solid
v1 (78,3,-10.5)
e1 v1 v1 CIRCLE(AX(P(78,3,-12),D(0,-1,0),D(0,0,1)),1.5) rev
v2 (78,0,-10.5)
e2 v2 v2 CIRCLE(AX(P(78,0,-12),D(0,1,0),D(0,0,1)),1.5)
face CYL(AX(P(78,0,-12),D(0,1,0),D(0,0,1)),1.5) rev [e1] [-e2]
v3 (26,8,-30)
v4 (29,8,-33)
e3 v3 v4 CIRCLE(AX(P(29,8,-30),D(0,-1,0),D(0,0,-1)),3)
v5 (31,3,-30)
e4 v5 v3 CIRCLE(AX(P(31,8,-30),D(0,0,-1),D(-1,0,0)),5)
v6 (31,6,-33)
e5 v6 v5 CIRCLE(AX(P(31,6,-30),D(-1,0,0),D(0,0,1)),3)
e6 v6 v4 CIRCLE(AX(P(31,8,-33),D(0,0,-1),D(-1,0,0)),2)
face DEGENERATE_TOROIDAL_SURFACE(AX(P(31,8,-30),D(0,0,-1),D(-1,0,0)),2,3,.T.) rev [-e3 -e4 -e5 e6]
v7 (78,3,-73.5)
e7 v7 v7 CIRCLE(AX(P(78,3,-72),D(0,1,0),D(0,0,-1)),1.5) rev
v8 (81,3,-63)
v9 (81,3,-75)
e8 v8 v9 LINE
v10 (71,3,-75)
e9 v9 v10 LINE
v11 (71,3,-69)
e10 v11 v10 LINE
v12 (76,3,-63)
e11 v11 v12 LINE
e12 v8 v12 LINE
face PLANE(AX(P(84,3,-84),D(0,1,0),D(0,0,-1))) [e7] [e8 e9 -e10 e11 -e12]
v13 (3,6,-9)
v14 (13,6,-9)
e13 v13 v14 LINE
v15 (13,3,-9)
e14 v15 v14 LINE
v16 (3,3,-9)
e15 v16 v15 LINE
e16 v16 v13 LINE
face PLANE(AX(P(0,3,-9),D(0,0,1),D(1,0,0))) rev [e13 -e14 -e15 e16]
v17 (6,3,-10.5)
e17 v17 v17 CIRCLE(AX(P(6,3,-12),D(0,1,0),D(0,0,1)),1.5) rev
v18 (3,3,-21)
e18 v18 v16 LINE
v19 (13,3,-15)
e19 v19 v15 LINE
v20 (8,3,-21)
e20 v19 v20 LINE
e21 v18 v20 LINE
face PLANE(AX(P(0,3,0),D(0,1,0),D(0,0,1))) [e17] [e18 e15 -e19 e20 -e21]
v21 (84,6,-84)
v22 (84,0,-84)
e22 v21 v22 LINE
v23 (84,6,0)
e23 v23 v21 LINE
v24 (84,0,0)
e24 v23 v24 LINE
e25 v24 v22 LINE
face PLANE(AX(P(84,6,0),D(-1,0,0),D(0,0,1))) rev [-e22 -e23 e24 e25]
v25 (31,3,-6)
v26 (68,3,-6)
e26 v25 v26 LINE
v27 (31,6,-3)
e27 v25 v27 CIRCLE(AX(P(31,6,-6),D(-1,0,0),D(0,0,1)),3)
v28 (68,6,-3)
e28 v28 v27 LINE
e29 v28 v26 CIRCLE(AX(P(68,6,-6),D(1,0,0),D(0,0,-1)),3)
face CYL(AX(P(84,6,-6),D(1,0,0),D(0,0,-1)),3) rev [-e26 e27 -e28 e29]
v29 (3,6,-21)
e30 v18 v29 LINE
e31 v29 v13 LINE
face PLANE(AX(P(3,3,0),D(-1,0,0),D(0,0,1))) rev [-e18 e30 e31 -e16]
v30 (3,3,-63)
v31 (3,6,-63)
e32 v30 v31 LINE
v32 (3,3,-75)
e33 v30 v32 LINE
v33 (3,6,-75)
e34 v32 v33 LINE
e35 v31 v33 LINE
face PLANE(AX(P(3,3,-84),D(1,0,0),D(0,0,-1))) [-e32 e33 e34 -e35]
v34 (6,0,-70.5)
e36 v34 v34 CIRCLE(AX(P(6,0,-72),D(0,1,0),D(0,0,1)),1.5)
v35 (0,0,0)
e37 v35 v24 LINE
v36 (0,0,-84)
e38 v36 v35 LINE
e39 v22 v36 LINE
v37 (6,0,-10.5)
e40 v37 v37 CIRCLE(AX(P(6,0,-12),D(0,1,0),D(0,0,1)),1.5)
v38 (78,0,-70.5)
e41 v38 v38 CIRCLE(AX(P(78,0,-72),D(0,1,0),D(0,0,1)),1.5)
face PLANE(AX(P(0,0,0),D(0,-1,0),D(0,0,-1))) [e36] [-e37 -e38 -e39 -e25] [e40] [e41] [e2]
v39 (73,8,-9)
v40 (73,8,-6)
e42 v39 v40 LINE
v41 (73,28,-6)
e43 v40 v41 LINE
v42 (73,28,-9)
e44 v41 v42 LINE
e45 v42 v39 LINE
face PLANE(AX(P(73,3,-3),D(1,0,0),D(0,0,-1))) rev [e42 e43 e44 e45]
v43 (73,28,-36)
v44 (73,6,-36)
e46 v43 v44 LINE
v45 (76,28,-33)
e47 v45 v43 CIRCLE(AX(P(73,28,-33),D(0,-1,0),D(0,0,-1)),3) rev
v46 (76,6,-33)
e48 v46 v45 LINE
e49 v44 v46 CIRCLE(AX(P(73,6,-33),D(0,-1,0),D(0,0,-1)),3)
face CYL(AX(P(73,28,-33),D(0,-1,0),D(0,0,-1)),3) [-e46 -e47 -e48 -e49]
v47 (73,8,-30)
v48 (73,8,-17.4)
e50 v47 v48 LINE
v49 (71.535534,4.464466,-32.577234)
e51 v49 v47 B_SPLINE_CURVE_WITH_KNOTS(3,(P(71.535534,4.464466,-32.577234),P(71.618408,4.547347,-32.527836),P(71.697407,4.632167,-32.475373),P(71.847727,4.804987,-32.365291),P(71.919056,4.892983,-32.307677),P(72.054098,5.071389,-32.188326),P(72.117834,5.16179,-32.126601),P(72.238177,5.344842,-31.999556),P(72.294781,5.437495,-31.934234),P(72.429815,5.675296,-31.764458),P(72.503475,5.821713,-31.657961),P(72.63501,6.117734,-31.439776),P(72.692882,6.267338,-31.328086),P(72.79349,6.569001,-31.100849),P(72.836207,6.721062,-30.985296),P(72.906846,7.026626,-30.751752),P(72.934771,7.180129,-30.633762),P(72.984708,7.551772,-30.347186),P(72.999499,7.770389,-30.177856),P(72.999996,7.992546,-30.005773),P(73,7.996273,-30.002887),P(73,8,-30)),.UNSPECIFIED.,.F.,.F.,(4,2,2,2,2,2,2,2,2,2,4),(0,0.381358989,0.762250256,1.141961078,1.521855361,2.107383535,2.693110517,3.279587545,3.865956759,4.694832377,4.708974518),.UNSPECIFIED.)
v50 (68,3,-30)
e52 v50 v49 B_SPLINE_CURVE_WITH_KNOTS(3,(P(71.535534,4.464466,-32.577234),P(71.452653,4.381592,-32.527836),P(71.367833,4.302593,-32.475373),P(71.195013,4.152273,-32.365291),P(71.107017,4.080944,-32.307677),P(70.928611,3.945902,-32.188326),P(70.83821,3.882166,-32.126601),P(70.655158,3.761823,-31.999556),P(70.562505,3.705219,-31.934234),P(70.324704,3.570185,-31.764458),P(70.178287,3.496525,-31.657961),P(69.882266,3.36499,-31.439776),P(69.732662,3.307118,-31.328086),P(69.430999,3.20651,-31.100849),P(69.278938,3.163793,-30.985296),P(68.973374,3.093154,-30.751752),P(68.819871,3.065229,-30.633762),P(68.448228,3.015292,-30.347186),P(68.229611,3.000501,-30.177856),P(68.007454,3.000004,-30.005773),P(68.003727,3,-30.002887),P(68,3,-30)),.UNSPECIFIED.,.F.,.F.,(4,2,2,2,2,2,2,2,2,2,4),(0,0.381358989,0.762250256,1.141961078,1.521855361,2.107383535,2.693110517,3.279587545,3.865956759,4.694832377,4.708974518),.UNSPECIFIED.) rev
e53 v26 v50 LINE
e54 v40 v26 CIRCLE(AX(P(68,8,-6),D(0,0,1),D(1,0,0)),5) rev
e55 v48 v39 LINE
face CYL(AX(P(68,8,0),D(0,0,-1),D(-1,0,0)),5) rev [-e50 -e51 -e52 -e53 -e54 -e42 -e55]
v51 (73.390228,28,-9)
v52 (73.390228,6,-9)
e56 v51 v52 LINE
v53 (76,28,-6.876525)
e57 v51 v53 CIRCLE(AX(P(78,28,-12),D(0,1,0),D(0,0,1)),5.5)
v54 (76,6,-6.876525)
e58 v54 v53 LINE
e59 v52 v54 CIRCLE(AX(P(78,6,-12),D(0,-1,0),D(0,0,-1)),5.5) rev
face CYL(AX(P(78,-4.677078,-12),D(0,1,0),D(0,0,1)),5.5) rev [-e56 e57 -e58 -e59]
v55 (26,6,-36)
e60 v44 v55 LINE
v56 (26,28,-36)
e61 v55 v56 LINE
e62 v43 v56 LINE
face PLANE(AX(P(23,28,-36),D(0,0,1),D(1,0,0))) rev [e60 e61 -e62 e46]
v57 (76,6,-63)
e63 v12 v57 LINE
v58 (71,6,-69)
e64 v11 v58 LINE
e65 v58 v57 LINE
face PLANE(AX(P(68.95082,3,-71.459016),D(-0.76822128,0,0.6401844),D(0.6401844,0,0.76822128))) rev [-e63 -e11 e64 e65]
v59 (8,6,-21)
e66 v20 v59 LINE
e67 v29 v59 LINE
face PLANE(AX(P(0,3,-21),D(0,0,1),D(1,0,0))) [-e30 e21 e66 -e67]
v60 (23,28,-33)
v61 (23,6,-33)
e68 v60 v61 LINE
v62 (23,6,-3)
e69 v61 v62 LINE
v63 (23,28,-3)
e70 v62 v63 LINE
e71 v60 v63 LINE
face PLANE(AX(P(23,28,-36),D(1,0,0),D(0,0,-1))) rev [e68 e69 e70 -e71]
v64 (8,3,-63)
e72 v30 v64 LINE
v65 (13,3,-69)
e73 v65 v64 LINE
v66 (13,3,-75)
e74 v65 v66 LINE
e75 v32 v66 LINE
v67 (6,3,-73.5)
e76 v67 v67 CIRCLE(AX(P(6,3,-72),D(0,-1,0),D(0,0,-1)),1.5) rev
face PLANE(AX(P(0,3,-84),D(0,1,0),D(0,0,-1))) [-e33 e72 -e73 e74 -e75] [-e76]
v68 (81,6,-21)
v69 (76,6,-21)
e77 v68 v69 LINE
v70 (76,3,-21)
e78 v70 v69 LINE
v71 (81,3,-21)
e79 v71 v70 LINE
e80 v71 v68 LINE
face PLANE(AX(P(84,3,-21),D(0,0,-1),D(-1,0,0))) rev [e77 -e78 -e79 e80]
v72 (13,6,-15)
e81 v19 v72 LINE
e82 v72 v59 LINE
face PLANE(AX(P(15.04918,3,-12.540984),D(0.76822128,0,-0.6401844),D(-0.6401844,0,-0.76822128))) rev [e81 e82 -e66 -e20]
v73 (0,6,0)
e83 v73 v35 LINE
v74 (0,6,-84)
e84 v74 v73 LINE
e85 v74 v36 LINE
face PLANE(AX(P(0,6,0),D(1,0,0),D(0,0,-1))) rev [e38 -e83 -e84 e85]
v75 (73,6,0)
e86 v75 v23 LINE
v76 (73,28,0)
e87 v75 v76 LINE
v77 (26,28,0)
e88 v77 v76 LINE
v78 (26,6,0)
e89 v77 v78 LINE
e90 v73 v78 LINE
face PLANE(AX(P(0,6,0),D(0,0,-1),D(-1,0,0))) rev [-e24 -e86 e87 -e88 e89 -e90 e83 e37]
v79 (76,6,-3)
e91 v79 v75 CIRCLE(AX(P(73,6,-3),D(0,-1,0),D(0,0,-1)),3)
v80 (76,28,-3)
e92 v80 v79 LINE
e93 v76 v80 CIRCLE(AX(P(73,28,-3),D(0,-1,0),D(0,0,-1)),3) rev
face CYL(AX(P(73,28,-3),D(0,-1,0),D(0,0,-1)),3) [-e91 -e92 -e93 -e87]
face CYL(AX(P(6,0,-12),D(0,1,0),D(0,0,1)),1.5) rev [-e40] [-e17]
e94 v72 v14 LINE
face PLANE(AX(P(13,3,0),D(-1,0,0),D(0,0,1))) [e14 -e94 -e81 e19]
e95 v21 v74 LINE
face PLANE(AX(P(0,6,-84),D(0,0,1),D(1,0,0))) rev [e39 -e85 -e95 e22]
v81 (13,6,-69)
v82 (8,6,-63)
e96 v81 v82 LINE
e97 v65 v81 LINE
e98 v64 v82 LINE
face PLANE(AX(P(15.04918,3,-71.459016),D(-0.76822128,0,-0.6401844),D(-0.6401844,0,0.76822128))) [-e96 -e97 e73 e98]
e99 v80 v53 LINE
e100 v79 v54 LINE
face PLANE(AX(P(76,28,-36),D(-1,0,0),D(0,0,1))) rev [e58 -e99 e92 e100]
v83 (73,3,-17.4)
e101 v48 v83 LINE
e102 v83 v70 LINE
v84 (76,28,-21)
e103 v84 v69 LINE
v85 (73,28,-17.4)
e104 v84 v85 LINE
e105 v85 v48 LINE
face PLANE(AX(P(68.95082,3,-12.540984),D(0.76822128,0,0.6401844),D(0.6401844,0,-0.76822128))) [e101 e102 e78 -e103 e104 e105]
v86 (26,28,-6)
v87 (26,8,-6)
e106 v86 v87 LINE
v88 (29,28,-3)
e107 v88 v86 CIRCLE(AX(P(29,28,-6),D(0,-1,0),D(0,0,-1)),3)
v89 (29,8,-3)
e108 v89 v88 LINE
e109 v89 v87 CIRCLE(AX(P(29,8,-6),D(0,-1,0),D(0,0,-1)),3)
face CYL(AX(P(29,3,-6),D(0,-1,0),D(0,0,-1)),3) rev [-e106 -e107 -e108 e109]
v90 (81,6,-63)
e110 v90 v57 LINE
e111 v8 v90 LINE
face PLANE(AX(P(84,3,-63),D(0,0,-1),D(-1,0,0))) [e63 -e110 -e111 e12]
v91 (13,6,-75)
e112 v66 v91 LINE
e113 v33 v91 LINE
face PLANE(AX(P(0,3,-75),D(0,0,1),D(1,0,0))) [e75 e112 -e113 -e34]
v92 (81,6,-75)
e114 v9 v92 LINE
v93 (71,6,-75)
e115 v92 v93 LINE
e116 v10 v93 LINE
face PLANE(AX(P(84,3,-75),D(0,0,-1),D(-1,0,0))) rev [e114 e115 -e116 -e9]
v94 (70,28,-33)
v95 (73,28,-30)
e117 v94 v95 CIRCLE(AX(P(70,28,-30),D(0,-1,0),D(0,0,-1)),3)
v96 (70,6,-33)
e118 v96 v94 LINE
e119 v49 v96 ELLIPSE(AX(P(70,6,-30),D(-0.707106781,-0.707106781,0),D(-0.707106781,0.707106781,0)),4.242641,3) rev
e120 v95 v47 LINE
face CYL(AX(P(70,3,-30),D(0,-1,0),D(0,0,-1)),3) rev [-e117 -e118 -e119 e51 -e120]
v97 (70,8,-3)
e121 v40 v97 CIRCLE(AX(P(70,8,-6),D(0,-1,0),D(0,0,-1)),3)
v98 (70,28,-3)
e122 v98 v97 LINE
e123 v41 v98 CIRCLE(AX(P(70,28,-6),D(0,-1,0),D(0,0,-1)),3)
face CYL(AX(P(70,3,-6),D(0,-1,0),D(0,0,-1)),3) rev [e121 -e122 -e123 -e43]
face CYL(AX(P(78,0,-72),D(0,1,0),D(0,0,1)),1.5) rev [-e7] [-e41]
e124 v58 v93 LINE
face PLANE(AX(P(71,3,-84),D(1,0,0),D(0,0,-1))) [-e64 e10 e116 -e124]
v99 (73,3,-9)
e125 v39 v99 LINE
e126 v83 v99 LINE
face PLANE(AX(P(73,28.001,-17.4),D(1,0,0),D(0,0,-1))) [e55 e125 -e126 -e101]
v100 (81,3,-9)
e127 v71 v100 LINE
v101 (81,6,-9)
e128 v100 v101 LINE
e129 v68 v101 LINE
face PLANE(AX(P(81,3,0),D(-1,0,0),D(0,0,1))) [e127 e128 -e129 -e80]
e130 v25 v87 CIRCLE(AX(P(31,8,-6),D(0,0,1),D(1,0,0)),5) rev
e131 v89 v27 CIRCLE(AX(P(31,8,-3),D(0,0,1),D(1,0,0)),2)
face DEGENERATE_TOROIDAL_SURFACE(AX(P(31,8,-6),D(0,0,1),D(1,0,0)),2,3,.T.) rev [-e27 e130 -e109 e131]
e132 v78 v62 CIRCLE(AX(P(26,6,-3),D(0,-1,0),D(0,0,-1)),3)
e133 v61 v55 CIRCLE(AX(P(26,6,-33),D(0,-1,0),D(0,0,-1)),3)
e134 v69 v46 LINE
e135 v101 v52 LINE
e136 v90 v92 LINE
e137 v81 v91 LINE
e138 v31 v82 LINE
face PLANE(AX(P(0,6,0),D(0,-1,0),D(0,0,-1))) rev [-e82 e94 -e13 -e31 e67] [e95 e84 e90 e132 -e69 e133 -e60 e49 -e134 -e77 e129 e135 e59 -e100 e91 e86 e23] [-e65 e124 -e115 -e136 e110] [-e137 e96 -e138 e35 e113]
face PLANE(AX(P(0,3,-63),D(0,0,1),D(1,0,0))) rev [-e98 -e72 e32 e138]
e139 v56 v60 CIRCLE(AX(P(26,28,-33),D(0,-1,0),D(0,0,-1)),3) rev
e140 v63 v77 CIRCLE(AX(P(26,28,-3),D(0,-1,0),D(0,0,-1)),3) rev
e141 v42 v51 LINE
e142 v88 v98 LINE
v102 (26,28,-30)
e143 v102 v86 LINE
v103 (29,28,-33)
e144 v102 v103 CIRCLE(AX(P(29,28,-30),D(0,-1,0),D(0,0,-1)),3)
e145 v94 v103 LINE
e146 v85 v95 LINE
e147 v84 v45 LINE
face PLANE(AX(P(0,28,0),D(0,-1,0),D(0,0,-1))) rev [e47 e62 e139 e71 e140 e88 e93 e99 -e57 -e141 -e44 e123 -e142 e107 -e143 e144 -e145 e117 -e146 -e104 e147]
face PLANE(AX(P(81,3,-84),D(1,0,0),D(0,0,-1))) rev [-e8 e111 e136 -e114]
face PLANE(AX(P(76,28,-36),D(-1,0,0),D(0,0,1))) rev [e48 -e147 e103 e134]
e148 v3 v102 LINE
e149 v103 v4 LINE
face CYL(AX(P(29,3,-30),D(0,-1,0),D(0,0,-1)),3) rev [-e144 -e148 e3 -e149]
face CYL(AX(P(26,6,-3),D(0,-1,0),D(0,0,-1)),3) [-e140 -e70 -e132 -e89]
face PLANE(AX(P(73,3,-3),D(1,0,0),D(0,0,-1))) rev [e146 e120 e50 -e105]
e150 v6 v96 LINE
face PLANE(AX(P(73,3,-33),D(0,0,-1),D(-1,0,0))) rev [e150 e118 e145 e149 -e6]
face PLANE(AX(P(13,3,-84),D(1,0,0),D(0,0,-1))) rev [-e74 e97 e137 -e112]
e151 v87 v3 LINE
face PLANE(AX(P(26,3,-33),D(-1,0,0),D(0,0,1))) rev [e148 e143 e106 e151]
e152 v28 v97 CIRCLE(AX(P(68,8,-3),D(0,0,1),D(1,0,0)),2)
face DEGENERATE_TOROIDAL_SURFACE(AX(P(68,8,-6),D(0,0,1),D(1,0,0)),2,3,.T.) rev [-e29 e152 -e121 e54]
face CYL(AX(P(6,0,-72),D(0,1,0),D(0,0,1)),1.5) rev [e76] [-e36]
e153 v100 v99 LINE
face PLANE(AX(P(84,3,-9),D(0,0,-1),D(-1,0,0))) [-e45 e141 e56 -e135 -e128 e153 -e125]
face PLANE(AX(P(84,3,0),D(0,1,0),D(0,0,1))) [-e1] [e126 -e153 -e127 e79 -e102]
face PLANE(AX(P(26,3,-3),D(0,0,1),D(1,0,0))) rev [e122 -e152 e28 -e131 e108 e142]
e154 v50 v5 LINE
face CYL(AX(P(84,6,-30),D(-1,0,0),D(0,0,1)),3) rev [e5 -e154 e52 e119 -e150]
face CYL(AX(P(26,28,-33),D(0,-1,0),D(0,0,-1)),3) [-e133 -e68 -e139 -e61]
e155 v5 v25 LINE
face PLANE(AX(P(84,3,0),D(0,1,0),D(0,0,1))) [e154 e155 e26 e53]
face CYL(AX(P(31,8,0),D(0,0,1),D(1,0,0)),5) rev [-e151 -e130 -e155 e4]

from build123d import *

# Parameters (mm, degrees)
SKETCH1_W               = 84
SKETCH1_H               = 84
BOSS_EXTRUDE1_DEPTH     = 6
SKETCH2_R               = 1.5
CUT_EXTRUDE1_DEPTH      = 119.94536561
SKETCH4_R               = 1.5
CUT_EXTRUDE4_DEPTH      = 3
MIRROR3_COPY_1_SKETCH_R = 1.5
MIRROR3_COPY_1_DEPTH    = 3
SKETCH5_W               = 53
SKETCH5_H               = 36
BOSS_EXTRUDE2_DEPTH     = 22
SKETCH6_W               = 47
SKETCH6_H               = 30
CUT_EXTRUDE5_DEPTH      = 25
FILLET1_R               = 3
FILLET2_R               = 5
BOSS_EXTRUDE3_START     = -17.4
BOSS_EXTRUDE3_DEPTH     = 8.4
CUT_EXTRUDE14_START     = -22
CUT_EXTRUDE14_DEPTH     = 22
CUT_EXTRUDE15_DEPTH     = 122.396046085


# Read off the part's stored shape, not the designer's step: Boss-Extrude3
with BuildPart() as part:
    # Sketch1 → Boss-Extrude1 (new body)
    with BuildSketch(Plane(origin=(0, 0, 0), x_dir=(1, 0, 0), z_dir=(0, 1, 0))):
        with Locations((42, 42)):
            Rectangle(SKETCH1_W, SKETCH1_H)
    extrude(amount=BOSS_EXTRUDE1_DEPTH)

    # Sketch2 → Cut-Extrude1 (cut, through all)
    with BuildSketch(Plane(origin=(0, 6, 0), x_dir=(1, 0, 0), z_dir=(0, 1, 0))):
        with Locations(Location((6, 72, 0), (0, 0, 270))):
            Circle(SKETCH2_R)
        with Locations(Location((6, 12, 0), (0, 0, 270))):
            Circle(SKETCH2_R)
        with Locations(Location((78, 12, 0), (0, 0, 270))):
            Circle(SKETCH2_R)
        with Locations(Location((78, 72, 0), (0, 0, 270))):
            Circle(SKETCH2_R)
    extrude(amount=-CUT_EXTRUDE1_DEPTH, mode=Mode.SUBTRACT)

    # Sketch4 → Cut-Extrude4 (cut)
    with BuildSketch(Plane(origin=(0, 6, 0), x_dir=(1, 0, 0), z_dir=(0, 1, 0))):
        Polygon((13, 15), (13, 9), (3, 9), (3, 21), (8, 21), align=None)
        with Locations(Location((6, 12, 0), (0, 0, 270))):
            Circle(SKETCH4_R, mode=Mode.SUBTRACT)
    cut_extrude4 = extrude(amount=-CUT_EXTRUDE4_DEPTH, mode=Mode.SUBTRACT)

    # Mirror2: Cut-Extrude4 across plane
    add(cut_extrude4.mirror(Plane.XY.offset(-42)), mode=Mode.SUBTRACT)

    # Mirror3: Cut-Extrude4 across plane
    add(cut_extrude4.mirror(Plane.ZY.offset(-42)), mode=Mode.SUBTRACT)

    # Mirror3 copy 1 sketch → Mirror3 copy 1 (cut)
    with BuildSketch(Plane(origin=(84, 6, -84), x_dir=(-1, 0, 0), z_dir=(0, 1, 0))):
        Polygon((13, 15), (13, 9), (3, 9), (3, 21), (8, 21), align=None)
        with Locations(Location((6, 12, 0), (0, 0, 270))):
            Circle(MIRROR3_COPY_1_SKETCH_R, mode=Mode.SUBTRACT)
    extrude(amount=-MIRROR3_COPY_1_DEPTH, mode=Mode.SUBTRACT)

    # Sketch5 → Boss-Extrude2 (add)
    with BuildSketch(Plane(origin=(0, 6, 0), x_dir=(1, 0, 0), z_dir=(0, 1, 0))):
        with Locations((49.5, 18)):
            Rectangle(SKETCH5_W, SKETCH5_H)
    extrude(amount=BOSS_EXTRUDE2_DEPTH)

    # Sketch6 → Cut-Extrude5 (cut)
    with BuildSketch(Plane(origin=(0, 28, 0), x_dir=(1, 0, 0), z_dir=(0, 1, 0))):
        with Locations((49.5, 18)):
            Rectangle(SKETCH6_W, SKETCH6_H)
    extrude(amount=-CUT_EXTRUDE5_DEPTH, mode=Mode.SUBTRACT)

    # Fillet1
    fillet1_edges = [part.edges().sort_by_distance(p)[0] for p in [
        (76, 17, -36),
        (23, 17, -36),
        (23, 17, 0),
        (76, 17, 0),
        (73, 15.5, -33),
        (49.5, 3, -3),
        (73, 15.5, -3),
        (26, 15.5, -3),
        (49.5, 3, -33),
        (26, 15.5, -33),
    ]]
    fillet(fillet1_edges, radius=FILLET1_R)

    # Fillet2
    # the kernel refuses this fillet: 5 mm, written as the material it adds along each edge
    with BuildSketch(Plane(origin=(31, 8, -3), x_dir=(-1, 0, 0), z_dir=(0, 1, 0))) as fillet2_piece_1:
        with BuildLine():
            CenterArc((2, -3), 3, 0, 90)
            Line((5, -3), (5, 0))
            Line((5, 0), (2, 0))
        make_face()
    revolve(axis=Axis((31, 8, -3), (0, 0, 1)), revolution_arc=90)
    with BuildSketch(Plane(origin=(31, 8, -33), x_dir=(0, -1, 0), z_dir=(1, 0, 0))) as fillet2_piece_2:
        with BuildLine():
            CenterArc((2, -3), 3, 0, 90)
            Line((5, -3), (5, 0))
            Line((5, 0), (2, 0))
        make_face()
    revolve(axis=Axis((31, 8, -33), (0, 0, -1)), revolution_arc=90)
    with BuildSketch(Plane(origin=(68, 8, -3), x_dir=(0, -1, 0), z_dir=(-1, 0, 0))) as fillet2_piece_3:
        with BuildLine():
            CenterArc((2, -3), 3, 0, 90)
            Line((5, -3), (5, 0))
            Line((5, 0), (2, 0))
        make_face()
    revolve(axis=Axis((68, 8, -3), (0, 0, 1)), revolution_arc=90)
    with BuildSketch(Plane(origin=(73, 3, -4.9), x_dir=(-1, 0, 0), z_dir=(0, 0, -1))) as fillet2_piece_4_section:
        with BuildLine():
            CenterArc((FILLET2_R, FILLET2_R), FILLET2_R, 180, 90)
            Line((0, FILLET2_R), (0, 0))
            Line((0, 0), (FILLET2_R, 0))
        make_face()
    fillet2_piece_4 = extrude(amount=37.6, mode=Mode.PRIVATE)
    fillet2_piece_4 = split(fillet2_piece_4, bisect_by=Plane(origin=(71.840443932, 4.051726495, -9), z_dir=(0, 0, 1)), keep=Keep.TOP, mode=Mode.PRIVATE)
    add(fillet2_piece_4)
    with BuildSketch(Plane(origin=(73, 3, -4.9), x_dir=(-1, 0, 0), z_dir=(0, 0, -1))) as fillet2_piece_5_section:
        with BuildLine():
            CenterArc((FILLET2_R, FILLET2_R), FILLET2_R, 180, 90)
            Line((0, FILLET2_R), (0, 0))
            Line((0, 0), (FILLET2_R, 0))
        make_face()
    fillet2_piece_5 = extrude(amount=37.6, mode=Mode.PRIVATE)
    fillet2_piece_5 = split(fillet2_piece_5, bisect_by=Plane(origin=(72.877053979, 6.49875804, -36), z_dir=(0, 0, 1)), keep=Keep.TOP, mode=Mode.PRIVATE)
    fillet2_piece_5 = split(fillet2_piece_5, bisect_by=Plane(origin=(72.877053979, 6, -13.126232387), z_dir=(0, 1, 0)), keep=Keep.TOP, mode=Mode.PRIVATE)
    add(fillet2_piece_5)
    with BuildSketch(Plane(origin=(73, 3, -4.9), x_dir=(-1, 0, 0), z_dir=(0, 0, -1))) as fillet2_piece_6_section:
        with BuildLine():
            CenterArc((FILLET2_R, FILLET2_R), FILLET2_R, 180, 90)
            Line((0, FILLET2_R), (0, 0))
            Line((0, 0), (FILLET2_R, 0))
        make_face()
    fillet2_piece_6 = extrude(amount=37.6, mode=Mode.PRIVATE)
    fillet2_piece_6 = split(fillet2_piece_6, bisect_by=Plane(origin=(74.593810092, 3.935909556, -19.312572111), z_dir=(-0.7682212795973755, 0, -0.6401843996644804)), keep=Keep.TOP, mode=Mode.PRIVATE)
    fillet2_piece_6 = split(fillet2_piece_6, bisect_by=Plane(origin=(71.754876355, 6, -21.678350226), z_dir=(0, -1, 0)), keep=Keep.TOP, mode=Mode.PRIVATE)
    add(fillet2_piece_6)
    with BuildSketch(Plane(origin=(73, 3, -3), x_dir=(-1, 0, 0), z_dir=(0, 0, -1))) as fillet2_piece_7:
        with BuildLine():
            CenterArc((FILLET2_R, FILLET2_R), FILLET2_R, 180, 90)
            Line((0, FILLET2_R), (0, 0))
            Line((0, 0), (FILLET2_R, 0))
        make_face()
    extrude(amount=6)
    with BuildSketch(Plane(origin=(73, 3, -3), x_dir=(-1, 0, 0), z_dir=(0, 0, -1))) as fillet2_piece_8_section:
        with BuildLine():
            CenterArc((FILLET2_R, FILLET2_R), FILLET2_R, 180, 90)
            Line((0, FILLET2_R), (0, 0))
            Line((0, 0), (FILLET2_R, 0))
        make_face()
    fillet2_piece_8 = extrude(amount=18.5, mode=Mode.PRIVATE)
    fillet2_piece_8 = split(fillet2_piece_8, bisect_by=Plane(origin=(72.877053979, 6, -13.126232386), z_dir=(0, 1, 0)), keep=Keep.TOP, mode=Mode.PRIVATE)
    add(fillet2_piece_8)
    with BuildSketch(Plane(origin=(73, 3, -3), x_dir=(-1, 0, 0), z_dir=(0, 0, -1))) as fillet2_piece_9_section:
        with BuildLine():
            CenterArc((FILLET2_R, FILLET2_R), FILLET2_R, 180, 90)
            Line((0, FILLET2_R), (0, 0))
            Line((0, 0), (FILLET2_R, 0))
        make_face()
    fillet2_piece_9 = extrude(amount=18.5, mode=Mode.PRIVATE)
    fillet2_piece_9 = split(fillet2_piece_9, bisect_by=Plane(origin=(73.049643728, 3.899661729, -17.459572473), z_dir=(-0.7682212795973755, 0, -0.6401843996644804)), keep=Keep.TOP, mode=Mode.PRIVATE)
    add(fillet2_piece_9)
    with BuildSketch(Plane(origin=(26, 3, -33), x_dir=(1, 0, 0), z_dir=(0, 0, 1))) as fillet2_piece_10:
        with BuildLine():
            CenterArc((FILLET2_R, FILLET2_R), FILLET2_R, 180, 90)
            Line((0, FILLET2_R), (0, 0))
            Line((0, 0), (FILLET2_R, 0))
        make_face()
    extrude(amount=30)

    # Boss-Extrude3 outline → Boss-Extrude3 (add)
    with BuildSketch(Plane.XY.offset(BOSS_EXTRUDE3_START)):
        with BuildLine():
            Line((73, 6), (72.582575695, 6))
            ThreePointArc((72.582575695, 6), (70.738612788, 3.816699867), (68, 3))
            Line((68, 3), (73, 3))
            Line((73, 3), (73, 6))
        make_face()
    extrude(amount=BOSS_EXTRUDE3_DEPTH)

    # Sketch8 → Cut-Extrude14 (cut)
    with BuildSketch(Plane(origin=(0, 28, 0), x_dir=(1, 0, 0), z_dir=(0, 1, 0)).offset(CUT_EXTRUDE14_START)):
        with BuildLine():
            Line((76, 9), (76, 17.123475383))
            ThreePointArc((76, 17.123475383), (74.22437799, 15.99933475), (73, 14.291287847))
            Line((73, 14.291287847), (73, 9.708712153))
            ThreePointArc((73, 9.708712153), (73.182064882, 9.347171095), (73.390227771, 9))
            Line((73.390227771, 9), (76, 9))
        make_face()
        with BuildLine():
            Line((76, 6.876524617), (76, 9))
            Line((76, 9), (73.390227771, 9))
            ThreePointArc((73.390227771, 9), (74.528752508, 7.733802531), (76, 6.876524617))
        make_face()
    extrude(amount=CUT_EXTRUDE14_DEPTH, mode=Mode.SUBTRACT)

    # Sketch13 → Cut-Extrude15 (cut, through all)
    with BuildSketch(Plane(origin=(0, 3, 0), x_dir=(1, 0, 0), z_dir=(0, 1, 0))):
        Polygon((73, 17.4), (73, 9), (81, 9), (81, 21), (76, 21), align=None)
    extrude(amount=CUT_EXTRUDE15_DEPTH, mode=Mode.SUBTRACT)


solid = part.part
